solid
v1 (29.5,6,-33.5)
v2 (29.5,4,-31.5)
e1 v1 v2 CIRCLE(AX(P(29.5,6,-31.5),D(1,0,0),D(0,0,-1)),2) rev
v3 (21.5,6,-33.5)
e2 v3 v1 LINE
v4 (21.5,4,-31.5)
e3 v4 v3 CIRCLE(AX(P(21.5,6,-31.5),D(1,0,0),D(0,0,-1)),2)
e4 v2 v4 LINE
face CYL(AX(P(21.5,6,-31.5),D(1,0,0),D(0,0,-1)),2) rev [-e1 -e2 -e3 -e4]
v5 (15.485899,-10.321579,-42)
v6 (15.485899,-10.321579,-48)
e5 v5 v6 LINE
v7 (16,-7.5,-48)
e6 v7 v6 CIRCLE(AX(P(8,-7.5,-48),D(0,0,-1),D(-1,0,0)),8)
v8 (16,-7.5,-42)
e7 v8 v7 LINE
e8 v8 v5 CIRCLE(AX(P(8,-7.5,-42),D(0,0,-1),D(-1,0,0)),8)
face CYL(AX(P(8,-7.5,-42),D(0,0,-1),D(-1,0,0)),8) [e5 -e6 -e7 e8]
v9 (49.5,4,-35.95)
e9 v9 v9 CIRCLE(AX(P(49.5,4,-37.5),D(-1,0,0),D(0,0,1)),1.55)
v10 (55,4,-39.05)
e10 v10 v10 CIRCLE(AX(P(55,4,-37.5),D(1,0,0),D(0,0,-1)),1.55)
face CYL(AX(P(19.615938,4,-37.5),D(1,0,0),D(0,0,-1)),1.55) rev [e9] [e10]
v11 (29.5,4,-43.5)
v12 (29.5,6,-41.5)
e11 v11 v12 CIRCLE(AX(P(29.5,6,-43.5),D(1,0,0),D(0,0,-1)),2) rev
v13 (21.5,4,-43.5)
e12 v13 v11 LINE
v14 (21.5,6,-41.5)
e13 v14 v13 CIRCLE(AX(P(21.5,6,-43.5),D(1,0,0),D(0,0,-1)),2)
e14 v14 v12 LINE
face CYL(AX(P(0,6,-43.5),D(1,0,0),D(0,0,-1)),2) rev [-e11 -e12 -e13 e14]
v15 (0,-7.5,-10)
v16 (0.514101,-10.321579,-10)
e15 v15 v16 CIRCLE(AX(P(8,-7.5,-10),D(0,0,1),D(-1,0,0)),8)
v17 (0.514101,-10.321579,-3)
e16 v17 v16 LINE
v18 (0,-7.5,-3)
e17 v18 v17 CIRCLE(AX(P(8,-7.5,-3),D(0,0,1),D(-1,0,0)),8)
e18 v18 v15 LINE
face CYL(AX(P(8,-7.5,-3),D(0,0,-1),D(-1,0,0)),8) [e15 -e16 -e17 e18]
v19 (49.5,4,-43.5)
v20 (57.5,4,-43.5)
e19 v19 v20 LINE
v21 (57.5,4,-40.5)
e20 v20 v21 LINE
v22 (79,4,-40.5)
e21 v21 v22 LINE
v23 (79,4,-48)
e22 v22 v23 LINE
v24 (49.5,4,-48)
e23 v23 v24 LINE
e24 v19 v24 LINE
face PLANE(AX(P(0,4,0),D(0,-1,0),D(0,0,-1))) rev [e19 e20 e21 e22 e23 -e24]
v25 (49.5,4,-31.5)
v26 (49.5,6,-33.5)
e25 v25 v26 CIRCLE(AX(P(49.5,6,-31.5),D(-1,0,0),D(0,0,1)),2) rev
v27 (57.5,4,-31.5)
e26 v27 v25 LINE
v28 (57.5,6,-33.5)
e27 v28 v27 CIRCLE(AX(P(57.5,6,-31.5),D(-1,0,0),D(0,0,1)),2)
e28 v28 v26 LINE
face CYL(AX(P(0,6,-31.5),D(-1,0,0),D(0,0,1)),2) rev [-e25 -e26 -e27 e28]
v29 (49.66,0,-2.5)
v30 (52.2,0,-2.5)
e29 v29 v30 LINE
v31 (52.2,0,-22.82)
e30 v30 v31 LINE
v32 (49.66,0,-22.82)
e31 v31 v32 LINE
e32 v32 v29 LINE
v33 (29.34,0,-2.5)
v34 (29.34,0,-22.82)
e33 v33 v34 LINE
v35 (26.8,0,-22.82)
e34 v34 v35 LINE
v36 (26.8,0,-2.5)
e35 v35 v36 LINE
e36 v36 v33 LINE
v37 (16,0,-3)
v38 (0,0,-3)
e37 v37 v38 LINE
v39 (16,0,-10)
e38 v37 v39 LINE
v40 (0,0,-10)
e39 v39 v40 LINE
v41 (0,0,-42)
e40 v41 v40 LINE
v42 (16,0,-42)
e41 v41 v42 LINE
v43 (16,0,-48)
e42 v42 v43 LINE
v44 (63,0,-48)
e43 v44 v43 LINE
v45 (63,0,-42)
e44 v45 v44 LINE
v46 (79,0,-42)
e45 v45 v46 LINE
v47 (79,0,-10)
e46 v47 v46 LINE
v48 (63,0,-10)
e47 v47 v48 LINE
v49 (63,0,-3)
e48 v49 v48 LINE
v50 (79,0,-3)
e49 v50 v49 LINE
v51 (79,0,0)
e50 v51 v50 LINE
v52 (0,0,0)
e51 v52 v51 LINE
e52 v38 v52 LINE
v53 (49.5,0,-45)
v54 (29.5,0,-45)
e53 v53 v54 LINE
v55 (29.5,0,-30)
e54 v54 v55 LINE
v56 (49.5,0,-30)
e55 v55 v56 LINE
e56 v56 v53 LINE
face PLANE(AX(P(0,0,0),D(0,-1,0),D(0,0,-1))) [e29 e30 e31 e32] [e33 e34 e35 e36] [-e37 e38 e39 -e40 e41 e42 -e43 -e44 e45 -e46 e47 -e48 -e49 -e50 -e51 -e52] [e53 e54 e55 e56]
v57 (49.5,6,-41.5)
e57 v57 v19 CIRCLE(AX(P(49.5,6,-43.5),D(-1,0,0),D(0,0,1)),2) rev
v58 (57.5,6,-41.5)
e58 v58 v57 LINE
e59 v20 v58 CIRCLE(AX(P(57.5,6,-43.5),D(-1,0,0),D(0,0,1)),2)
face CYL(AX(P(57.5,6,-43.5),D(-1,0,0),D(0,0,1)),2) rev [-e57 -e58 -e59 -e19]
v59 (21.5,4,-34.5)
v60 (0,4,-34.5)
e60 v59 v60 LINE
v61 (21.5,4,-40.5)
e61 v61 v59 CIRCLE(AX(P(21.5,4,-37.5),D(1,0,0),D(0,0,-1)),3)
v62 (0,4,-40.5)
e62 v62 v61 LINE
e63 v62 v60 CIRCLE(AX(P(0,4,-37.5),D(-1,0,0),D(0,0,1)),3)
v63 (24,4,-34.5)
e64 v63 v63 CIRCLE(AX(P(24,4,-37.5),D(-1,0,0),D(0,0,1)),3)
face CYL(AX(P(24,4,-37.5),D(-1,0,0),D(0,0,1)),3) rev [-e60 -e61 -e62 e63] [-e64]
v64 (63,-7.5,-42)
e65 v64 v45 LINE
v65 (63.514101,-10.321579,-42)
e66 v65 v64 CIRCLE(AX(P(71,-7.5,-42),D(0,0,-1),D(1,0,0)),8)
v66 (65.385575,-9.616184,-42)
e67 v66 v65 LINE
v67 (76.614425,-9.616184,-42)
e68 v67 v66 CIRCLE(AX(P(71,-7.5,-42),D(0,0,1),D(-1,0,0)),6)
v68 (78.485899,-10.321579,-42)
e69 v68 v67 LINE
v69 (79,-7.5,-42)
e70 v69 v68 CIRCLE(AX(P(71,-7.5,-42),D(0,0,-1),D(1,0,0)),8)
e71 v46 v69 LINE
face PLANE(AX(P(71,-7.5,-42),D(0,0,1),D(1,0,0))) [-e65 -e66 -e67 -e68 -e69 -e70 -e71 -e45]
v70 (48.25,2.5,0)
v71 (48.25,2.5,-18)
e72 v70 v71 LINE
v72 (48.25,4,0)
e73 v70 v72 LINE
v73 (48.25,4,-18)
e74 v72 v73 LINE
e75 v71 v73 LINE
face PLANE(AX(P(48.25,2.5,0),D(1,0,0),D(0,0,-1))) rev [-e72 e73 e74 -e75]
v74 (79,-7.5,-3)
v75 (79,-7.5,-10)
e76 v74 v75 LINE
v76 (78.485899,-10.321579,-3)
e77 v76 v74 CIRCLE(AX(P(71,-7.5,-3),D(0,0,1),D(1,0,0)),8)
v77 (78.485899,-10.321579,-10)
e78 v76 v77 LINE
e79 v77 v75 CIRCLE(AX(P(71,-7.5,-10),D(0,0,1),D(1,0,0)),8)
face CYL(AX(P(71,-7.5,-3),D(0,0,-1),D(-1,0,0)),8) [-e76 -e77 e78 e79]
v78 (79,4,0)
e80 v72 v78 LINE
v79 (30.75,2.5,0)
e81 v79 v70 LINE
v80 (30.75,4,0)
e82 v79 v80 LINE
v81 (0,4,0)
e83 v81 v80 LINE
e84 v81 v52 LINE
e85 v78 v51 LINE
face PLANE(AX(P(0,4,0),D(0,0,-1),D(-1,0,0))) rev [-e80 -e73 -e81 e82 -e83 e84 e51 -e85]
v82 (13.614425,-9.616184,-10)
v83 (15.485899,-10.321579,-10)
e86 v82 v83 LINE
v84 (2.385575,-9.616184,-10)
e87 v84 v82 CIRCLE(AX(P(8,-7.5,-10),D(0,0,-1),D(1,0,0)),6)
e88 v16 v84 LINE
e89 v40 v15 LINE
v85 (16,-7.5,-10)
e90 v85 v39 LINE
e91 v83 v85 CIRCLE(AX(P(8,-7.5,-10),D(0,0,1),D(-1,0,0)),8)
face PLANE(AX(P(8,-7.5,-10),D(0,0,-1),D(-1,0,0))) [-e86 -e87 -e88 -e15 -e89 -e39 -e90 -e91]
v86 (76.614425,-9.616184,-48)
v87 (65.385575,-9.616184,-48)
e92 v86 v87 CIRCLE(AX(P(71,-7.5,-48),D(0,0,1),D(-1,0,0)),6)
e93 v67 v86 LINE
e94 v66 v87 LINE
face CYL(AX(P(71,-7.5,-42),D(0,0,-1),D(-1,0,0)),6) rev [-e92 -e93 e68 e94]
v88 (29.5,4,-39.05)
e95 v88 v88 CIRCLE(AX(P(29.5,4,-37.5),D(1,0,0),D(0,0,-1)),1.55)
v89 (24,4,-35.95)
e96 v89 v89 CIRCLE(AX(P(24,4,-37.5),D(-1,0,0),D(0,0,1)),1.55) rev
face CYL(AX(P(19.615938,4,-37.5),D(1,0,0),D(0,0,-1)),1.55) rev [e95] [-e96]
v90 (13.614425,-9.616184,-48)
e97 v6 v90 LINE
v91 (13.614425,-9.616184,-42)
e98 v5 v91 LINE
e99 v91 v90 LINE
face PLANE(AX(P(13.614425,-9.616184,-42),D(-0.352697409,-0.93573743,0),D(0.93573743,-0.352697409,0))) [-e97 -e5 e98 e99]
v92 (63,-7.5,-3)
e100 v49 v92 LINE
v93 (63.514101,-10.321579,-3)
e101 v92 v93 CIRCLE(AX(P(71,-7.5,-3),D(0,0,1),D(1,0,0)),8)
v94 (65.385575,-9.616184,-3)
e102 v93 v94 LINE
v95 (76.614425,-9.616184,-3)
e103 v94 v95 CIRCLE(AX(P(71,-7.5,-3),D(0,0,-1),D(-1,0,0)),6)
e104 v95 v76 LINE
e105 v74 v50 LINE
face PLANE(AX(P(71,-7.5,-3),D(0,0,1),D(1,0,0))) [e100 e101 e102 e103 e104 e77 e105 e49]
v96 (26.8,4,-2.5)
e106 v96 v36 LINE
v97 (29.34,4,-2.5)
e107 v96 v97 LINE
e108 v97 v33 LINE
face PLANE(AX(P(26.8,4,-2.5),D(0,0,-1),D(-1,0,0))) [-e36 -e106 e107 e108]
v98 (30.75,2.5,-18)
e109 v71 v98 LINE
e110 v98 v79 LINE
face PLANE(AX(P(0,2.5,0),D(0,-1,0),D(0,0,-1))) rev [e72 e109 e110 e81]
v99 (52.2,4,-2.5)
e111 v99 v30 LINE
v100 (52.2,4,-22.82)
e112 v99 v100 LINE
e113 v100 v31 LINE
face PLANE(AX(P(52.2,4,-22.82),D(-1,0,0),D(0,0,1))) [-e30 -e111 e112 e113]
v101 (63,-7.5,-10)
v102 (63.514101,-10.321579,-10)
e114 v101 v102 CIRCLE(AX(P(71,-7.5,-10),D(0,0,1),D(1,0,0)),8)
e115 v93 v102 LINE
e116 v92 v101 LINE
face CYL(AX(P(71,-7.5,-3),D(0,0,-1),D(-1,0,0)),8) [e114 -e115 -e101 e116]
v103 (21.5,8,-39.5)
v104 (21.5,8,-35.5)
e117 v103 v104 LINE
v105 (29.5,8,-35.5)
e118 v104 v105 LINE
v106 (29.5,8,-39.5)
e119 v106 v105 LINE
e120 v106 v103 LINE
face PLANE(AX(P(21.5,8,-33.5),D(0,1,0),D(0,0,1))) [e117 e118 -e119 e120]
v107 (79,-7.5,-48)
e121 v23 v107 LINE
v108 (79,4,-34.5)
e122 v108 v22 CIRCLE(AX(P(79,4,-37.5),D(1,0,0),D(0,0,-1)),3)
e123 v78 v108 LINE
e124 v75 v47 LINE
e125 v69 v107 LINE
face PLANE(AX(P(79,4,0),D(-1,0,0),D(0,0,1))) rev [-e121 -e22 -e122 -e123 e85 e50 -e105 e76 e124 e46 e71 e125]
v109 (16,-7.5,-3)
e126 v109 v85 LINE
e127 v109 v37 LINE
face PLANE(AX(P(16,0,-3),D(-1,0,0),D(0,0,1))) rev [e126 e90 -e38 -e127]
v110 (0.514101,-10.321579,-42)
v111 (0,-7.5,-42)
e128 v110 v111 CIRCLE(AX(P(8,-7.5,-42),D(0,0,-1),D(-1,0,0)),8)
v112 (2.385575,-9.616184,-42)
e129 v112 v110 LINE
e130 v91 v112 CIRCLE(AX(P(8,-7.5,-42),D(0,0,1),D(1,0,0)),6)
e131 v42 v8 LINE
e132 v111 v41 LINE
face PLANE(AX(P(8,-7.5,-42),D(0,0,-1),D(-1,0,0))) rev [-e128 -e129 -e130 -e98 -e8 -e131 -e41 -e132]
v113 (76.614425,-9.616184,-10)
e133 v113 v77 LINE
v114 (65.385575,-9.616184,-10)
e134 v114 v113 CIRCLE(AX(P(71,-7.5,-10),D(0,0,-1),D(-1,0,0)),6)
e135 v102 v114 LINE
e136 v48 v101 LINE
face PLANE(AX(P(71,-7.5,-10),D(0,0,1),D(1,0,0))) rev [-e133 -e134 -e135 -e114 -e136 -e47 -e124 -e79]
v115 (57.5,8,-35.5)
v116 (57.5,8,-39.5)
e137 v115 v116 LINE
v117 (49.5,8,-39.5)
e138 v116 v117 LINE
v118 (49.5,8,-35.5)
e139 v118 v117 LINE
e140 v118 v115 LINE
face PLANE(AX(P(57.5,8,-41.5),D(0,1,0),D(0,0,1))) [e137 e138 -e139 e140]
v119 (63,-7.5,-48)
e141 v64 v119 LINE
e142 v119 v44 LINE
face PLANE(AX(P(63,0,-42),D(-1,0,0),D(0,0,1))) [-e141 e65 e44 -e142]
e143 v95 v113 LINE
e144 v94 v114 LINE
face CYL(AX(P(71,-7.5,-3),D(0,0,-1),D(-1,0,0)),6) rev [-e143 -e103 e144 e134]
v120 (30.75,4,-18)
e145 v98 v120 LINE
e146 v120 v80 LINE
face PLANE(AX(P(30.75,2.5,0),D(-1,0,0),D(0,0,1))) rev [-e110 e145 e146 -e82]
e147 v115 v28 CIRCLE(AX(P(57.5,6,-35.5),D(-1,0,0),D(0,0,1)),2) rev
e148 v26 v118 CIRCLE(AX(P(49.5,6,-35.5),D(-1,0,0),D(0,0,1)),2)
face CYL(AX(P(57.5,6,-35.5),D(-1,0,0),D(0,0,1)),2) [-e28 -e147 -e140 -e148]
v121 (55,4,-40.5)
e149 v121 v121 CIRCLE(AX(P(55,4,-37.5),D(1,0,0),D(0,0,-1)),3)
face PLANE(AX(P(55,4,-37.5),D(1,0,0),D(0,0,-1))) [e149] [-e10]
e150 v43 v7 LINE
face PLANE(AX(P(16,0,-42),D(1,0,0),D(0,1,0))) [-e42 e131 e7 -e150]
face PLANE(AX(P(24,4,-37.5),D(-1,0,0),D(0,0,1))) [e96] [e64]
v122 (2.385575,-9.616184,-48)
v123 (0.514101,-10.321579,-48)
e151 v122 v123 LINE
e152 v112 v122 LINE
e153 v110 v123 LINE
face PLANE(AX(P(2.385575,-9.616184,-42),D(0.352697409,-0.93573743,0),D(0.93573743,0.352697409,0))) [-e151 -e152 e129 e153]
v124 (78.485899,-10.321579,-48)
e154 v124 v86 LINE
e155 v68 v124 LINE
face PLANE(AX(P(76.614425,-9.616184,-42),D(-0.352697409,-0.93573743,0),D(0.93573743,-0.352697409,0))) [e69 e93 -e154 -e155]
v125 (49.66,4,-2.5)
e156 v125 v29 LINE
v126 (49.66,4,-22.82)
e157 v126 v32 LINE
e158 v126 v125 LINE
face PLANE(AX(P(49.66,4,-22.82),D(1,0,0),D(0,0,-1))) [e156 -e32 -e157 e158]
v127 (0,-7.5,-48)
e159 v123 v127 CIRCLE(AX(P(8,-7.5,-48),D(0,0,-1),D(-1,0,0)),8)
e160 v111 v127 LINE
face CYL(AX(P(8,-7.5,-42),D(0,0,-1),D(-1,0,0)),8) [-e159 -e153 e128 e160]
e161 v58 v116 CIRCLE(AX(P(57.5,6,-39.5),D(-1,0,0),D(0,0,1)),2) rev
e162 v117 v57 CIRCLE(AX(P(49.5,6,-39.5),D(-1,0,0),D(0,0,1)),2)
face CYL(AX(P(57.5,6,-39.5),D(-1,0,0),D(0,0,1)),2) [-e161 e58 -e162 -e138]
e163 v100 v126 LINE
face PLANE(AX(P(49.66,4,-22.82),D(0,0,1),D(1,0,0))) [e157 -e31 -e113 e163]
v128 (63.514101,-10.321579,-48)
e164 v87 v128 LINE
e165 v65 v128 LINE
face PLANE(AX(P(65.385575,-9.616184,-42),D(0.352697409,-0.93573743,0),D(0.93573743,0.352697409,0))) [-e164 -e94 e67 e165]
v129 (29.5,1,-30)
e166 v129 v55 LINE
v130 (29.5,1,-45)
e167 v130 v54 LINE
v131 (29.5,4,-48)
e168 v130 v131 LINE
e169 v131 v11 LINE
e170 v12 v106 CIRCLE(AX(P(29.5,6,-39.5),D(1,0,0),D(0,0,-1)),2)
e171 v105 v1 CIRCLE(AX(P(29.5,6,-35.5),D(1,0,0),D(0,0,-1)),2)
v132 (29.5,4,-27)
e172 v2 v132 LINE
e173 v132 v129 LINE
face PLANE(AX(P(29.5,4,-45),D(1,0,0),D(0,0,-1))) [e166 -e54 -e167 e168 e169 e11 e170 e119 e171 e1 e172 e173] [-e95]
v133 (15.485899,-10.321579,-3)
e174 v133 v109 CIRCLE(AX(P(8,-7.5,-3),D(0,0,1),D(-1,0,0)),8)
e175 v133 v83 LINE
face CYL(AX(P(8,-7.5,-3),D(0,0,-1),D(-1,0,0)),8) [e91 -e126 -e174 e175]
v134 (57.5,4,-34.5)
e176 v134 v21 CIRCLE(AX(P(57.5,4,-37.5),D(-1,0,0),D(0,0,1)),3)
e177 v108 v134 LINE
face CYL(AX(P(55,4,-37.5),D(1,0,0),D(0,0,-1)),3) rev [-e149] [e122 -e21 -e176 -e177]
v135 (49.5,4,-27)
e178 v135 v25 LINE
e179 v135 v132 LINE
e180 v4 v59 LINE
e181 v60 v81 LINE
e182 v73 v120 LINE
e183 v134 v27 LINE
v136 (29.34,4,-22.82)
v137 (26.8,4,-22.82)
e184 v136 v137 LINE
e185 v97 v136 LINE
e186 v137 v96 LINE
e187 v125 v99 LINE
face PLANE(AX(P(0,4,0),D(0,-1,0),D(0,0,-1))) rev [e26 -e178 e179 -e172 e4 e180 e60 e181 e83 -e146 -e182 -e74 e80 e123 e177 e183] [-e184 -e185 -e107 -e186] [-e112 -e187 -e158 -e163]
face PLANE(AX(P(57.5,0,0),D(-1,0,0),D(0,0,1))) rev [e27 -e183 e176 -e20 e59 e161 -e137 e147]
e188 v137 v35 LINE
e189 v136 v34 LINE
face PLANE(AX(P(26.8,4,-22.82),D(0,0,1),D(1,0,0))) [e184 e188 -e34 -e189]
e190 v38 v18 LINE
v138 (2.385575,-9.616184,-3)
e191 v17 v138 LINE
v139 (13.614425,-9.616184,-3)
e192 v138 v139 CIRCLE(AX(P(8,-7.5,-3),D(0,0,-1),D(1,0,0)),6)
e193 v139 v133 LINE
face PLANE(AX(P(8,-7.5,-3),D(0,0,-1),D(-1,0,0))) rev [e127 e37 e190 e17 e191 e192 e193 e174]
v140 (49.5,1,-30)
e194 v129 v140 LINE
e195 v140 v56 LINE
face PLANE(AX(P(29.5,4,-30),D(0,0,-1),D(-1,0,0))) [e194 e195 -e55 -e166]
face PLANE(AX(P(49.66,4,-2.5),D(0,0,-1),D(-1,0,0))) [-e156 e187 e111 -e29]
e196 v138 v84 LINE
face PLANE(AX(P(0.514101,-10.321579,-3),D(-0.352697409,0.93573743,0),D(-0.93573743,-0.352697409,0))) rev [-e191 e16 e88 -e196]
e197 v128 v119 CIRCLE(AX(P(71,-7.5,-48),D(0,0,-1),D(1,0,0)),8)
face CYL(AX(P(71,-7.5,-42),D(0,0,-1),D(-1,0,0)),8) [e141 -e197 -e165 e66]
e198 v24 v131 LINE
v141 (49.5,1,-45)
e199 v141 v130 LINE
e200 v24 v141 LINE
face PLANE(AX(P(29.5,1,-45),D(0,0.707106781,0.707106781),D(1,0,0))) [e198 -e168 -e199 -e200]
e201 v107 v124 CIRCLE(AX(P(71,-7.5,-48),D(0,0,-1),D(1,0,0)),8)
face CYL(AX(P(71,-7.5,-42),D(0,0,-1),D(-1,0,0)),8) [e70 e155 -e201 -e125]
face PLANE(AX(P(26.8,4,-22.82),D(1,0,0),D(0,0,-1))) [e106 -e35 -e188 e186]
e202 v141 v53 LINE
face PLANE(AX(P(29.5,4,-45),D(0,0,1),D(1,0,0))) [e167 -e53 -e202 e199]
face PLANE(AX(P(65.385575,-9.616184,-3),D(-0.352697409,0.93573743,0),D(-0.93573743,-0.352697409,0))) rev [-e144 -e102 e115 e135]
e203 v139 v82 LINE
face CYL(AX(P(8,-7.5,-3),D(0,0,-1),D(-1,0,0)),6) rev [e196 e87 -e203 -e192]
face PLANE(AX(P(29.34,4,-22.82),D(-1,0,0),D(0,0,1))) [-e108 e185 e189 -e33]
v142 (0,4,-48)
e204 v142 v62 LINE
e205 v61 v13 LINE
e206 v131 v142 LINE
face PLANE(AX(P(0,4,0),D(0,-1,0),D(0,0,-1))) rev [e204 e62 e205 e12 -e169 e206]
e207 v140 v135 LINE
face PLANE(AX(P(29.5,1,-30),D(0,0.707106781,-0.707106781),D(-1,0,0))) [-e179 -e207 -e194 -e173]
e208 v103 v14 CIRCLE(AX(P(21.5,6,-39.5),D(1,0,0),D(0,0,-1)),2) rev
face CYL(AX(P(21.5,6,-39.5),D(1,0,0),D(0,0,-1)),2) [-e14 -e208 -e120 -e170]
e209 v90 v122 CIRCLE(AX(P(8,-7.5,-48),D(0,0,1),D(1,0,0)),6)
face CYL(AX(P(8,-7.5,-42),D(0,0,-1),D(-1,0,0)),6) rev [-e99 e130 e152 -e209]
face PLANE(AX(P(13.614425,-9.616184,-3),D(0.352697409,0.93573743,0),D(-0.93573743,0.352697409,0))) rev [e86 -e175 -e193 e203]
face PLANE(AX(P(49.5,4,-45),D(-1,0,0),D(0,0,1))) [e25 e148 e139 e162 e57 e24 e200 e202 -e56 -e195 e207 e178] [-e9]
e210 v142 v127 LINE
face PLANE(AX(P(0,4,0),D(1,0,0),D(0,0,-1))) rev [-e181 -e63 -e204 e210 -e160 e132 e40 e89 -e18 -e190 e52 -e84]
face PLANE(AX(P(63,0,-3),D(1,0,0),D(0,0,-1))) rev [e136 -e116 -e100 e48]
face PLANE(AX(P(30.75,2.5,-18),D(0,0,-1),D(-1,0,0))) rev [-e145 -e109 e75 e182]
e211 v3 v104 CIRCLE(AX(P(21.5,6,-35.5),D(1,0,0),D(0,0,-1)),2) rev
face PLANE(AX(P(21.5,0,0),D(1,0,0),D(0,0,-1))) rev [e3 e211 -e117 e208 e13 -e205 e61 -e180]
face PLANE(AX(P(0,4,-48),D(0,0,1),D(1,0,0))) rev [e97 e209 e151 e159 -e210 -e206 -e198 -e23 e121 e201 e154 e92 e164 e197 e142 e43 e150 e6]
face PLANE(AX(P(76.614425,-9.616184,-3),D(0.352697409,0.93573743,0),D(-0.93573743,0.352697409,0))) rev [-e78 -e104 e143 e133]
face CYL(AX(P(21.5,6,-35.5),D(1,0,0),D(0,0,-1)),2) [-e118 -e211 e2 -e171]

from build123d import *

# Parameters (mm, degrees)
SKETCH_1_W          = 79
SKETCH_1_H          = 48
SKETCH_1_W_2        = 2.54
SKETCH_1_H_2        = 20.32
SKETCH_1_W_3        = 20
SKETCH_1_H_3        = 15
EXTRUDE_1_DEPTH     = 4
SKETCH_3_W          = 8
SKETCH_3_H          = 4
EXTRUDE_2_DEPTH     = 8
FILLET_1_R          = 2
SKETCH_5_R          = 3
CUT_EXTRUDE_1_DEPTH = 24
SKETCH2_W           = 8
SKETCH2_H           = 4
BOSS_EXTRUDE1_DEPTH = 8
FILLET1_R           = 2
CUT_EXTRUDE2_START  = -24
SKETCH3_R           = 3
CUT_EXTRUDE2_DEPTH  = 24
CHAMFER1_SIZE       = 3
CUT_EXTRUDE5_REACH  = 75.437
SKETCH8_R           = 1.55
BOSS_EXTRUDE4_DEPTH = 6
SKETCH10_W          = 17.5
SKETCH10_H          = 18
CUT_EXTRUDE6_DEPTH  = 1.5
BOSS_EXTRUDE5_DEPTH = 7


with BuildPart() as part:
    # Эскиз1 → Бобышка-Вытянуть1 (new body)
    with BuildSketch(Plane(origin=(0, 0, 0), x_dir=(1, 0, 0), z_dir=(0, 1, 0))):
        with Locations((39.5, 24)):
            Rectangle(SKETCH_1_W, SKETCH_1_H)
        with Locations((28.07, 12.66)):
            Rectangle(SKETCH_1_W_2, SKETCH_1_H_2, mode=Mode.SUBTRACT)
        with Locations((50.93, 12.66)):
            Rectangle(SKETCH_1_W_2, SKETCH_1_H_2, mode=Mode.SUBTRACT)
        with Locations((39.5, 37.5)):
            Rectangle(SKETCH_1_W_3, SKETCH_1_H_3, mode=Mode.SUBTRACT)
    extrude(amount=EXTRUDE_1_DEPTH)

    # Эскиз3 → Бобышка-Вытянуть2 (add)
    with BuildSketch(Plane(origin=(29.5, 0, 0), x_dir=(0, 0, -1), z_dir=(1, 0, 0))):
        with Locations((37.5, 6)):
            Rectangle(SKETCH_3_W, SKETCH_3_H)
    extrude(amount=-EXTRUDE_2_DEPTH)

    # Скругление1
    fillet_1_edges = [part.edges().sort_by_distance(p)[0] for p in [
        (25.5, 4, -41.5),
        (25.5, 4, -33.5),
    ]]
    fillet(fillet_1_edges, radius=FILLET_1_R)
    fillet_1_2_edges = [part.edges().sort_by_distance(p)[0] for p in [
        (25.5, 8, -41.5),
        (25.5, 8, -33.5),
    ]]
    fillet(fillet_1_2_edges, radius=FILLET_1_R - 0.0001)  # a hair under: the kernel refuses the full size

    # Эскиз5 → Вырез-Вытянуть1 (cut)
    with BuildSketch(Plane.ZY):
        with Locations((-37.5, 4)):
            Circle(SKETCH_5_R)
    extrude(amount=-CUT_EXTRUDE_1_DEPTH, mode=Mode.SUBTRACT)

    # Sketch2 → Boss-Extrude1 (add)
    with BuildSketch(Plane.ZY.offset(-49.5)):
        with Locations((-37.5, 6)):
            Rectangle(SKETCH2_W, SKETCH2_H)
    extrude(amount=-BOSS_EXTRUDE1_DEPTH)

    # Fillet1
    fillet1_edges = [part.edges().sort_by_distance(p)[0] for p in [
        (53.5, 4, -33.5),
    ]]
    fillet(fillet1_edges, radius=FILLET1_R)
    fillet1_2_edges = [part.edges().sort_by_distance(p)[0] for p in [
        (53.5, 4, -41.5),
    ]]
    fillet(fillet1_2_edges, radius=FILLET1_R)
    fillet1_3_edges = [part.edges().sort_by_distance(p)[0] for p in [
        (53.5, 8, -33.5),
    ]]
    fillet(fillet1_3_edges, radius=FILLET1_R - 0.0001)  # a hair under: the kernel refuses the full size
    fillet1_4_edges = [part.edges().sort_by_distance(p)[0] for p in [
        (53.5, 8, -41.5),
    ]]
    fillet(fillet1_4_edges, radius=FILLET1_R - 0.0001)  # a hair under: the kernel refuses the full size

    # Sketch3 → Cut-Extrude2 (cut)
    with BuildSketch(Plane(origin=(79, 0, 0), x_dir=(0, 0, -1), z_dir=(1, 0, 0)).offset(CUT_EXTRUDE2_START)):
        with Locations(Location((37.5, 4, 0), (0, 0, 180))):
            Circle(SKETCH3_R)
    extrude(amount=CUT_EXTRUDE2_DEPTH, mode=Mode.SUBTRACT)

    # Chamfer1
    chamfer1_edges = [part.edges().sort_by_distance(p)[0] for p in [
        (39.5, 4, -30),
        (39.5, 4, -45),
    ]]
    chamfer(chamfer1_edges, length=CHAMFER1_SIZE - 0.0001)  # a hair under: the kernel refuses the full size

    # Cut-Extrude5: up to this face of the body (flat: up to its plane)
    cut_extrude5_end = Plane(part.part.faces().sort_by_distance((24, 4, -37.5))[0])
    # Sketch8 → Cut-Extrude5 (cut, up to the picked face)
    with BuildSketch(Plane(origin=(55, 0, 0), x_dir=(0, 0, -1), z_dir=(1, 0, 0)), mode=Mode.PRIVATE) as cut_extrude5_sk1:
        with Locations((37.5, 4)):
            Circle(SKETCH8_R)
    cut_extrude5_tool1 = split(extrude(cut_extrude5_sk1.sketch, amount=-CUT_EXTRUDE5_REACH, mode=Mode.PRIVATE), bisect_by=cut_extrude5_end, keep=Keep.BOTH, mode=Mode.PRIVATE)
    add(cut_extrude5_tool1.solids().sort_by(Axis((55, 4, -37.5), (-1, 0, 0)))[0], mode=Mode.SUBTRACT)

    # Sketch9 → Boss-Extrude4 (add)
    with BuildSketch(Plane(origin=(0, 0, -48), x_dir=(-1, 0, 0), z_dir=(0, 0, -1))):
        with BuildLine():
            Line((-79, 0), (-63, 0))
            Line((-63, 0), (-63, -7.5))
            ThreePointArc((-63, -7.5), (-63.129574487, -8.934016124), (-63.514100561, -10.321579273))
            Line((-63.514100561, -10.321579273), (-65.385575421, -9.616184455))
            ThreePointArc((-65.385575421, -9.616184455), (-71, -1.5), (-76.614424579, -9.616184455))
            Line((-76.614424579, -9.616184455), (-78.485899439, -10.321579273))
            ThreePointArc((-78.485899439, -10.321579273), (-78.870425513, -8.934016124), (-79, -7.5))
            Line((-79, -7.5), (-79, 0))
        make_face()
        with BuildLine():
            Line((-13.614424579, -9.616184455), (-15.485899439, -10.321579273))
            ThreePointArc((-15.485899439, -10.321579273), (-15.870425513, -8.934016124), (-16, -7.5))
            Line((-16, -7.5), (-16, 0))
            Line((-16, 0), (0, 0))
            Line((0, 0), (0, -7.5))
            ThreePointArc((0, -7.5), (-0.129574487, -8.934016124), (-0.514100561, -10.321579273))
            Line((-0.514100561, -10.321579273), (-2.385575421, -9.616184455))
            ThreePointArc((-2.385575421, -9.616184455), (-8, -1.5), (-13.614424579, -9.616184455))
        make_face()
    extrude(amount=-BOSS_EXTRUDE4_DEPTH)

    # Sketch10 → Cut-Extrude6 (cut)
    with BuildSketch(Plane(origin=(0, 4, 0), x_dir=(1, 0, 0), z_dir=(0, 1, 0))):
        with Locations((39.5, 9)):
            Rectangle(SKETCH10_W, SKETCH10_H)
    extrude(amount=-CUT_EXTRUDE6_DEPTH, mode=Mode.SUBTRACT)

    # Sketch13 → Boss-Extrude5 (add)
    with BuildSketch(Plane.XY.offset(-10)):
        with BuildLine():
            Line((0, 0), (16, 0))
            Line((16, 0), (16, -7.5))
            ThreePointArc((16, -7.5), (15.870425513, -8.934016124), (15.485899439, -10.321579273))
            Line((15.485899439, -10.321579273), (13.614424579, -9.616184455))
            ThreePointArc((13.614424579, -9.616184455), (8, -1.5), (2.385575421, -9.616184455))
            Line((2.385575421, -9.616184455), (0.514100561, -10.321579273))
            ThreePointArc((0.514100561, -10.321579273), (0.129574487, -8.934016124), (0, -7.5))
            Line((0, -7.5), (0, 0))
        make_face()
        with BuildLine():
            Line((63, 0), (63, -7.5))
            ThreePointArc((63, -7.5), (63.129574487, -8.934016124), (63.514100561, -10.321579273))
            Line((63.514100561, -10.321579273), (65.385575421, -9.616184455))
            ThreePointArc((65.385575421, -9.616184455), (71, -1.5), (76.614424579, -9.616184455))
            Line((76.614424579, -9.616184455), (78.485899439, -10.321579273))
            ThreePointArc((78.485899439, -10.321579273), (78.870425513, -8.934016124), (79, -7.5))
            Line((79, -7.5), (79, 0))
            Line((79, 0), (63, 0))
        make_face()
    extrude(amount=BOSS_EXTRUDE5_DEPTH)


solid = part.part
